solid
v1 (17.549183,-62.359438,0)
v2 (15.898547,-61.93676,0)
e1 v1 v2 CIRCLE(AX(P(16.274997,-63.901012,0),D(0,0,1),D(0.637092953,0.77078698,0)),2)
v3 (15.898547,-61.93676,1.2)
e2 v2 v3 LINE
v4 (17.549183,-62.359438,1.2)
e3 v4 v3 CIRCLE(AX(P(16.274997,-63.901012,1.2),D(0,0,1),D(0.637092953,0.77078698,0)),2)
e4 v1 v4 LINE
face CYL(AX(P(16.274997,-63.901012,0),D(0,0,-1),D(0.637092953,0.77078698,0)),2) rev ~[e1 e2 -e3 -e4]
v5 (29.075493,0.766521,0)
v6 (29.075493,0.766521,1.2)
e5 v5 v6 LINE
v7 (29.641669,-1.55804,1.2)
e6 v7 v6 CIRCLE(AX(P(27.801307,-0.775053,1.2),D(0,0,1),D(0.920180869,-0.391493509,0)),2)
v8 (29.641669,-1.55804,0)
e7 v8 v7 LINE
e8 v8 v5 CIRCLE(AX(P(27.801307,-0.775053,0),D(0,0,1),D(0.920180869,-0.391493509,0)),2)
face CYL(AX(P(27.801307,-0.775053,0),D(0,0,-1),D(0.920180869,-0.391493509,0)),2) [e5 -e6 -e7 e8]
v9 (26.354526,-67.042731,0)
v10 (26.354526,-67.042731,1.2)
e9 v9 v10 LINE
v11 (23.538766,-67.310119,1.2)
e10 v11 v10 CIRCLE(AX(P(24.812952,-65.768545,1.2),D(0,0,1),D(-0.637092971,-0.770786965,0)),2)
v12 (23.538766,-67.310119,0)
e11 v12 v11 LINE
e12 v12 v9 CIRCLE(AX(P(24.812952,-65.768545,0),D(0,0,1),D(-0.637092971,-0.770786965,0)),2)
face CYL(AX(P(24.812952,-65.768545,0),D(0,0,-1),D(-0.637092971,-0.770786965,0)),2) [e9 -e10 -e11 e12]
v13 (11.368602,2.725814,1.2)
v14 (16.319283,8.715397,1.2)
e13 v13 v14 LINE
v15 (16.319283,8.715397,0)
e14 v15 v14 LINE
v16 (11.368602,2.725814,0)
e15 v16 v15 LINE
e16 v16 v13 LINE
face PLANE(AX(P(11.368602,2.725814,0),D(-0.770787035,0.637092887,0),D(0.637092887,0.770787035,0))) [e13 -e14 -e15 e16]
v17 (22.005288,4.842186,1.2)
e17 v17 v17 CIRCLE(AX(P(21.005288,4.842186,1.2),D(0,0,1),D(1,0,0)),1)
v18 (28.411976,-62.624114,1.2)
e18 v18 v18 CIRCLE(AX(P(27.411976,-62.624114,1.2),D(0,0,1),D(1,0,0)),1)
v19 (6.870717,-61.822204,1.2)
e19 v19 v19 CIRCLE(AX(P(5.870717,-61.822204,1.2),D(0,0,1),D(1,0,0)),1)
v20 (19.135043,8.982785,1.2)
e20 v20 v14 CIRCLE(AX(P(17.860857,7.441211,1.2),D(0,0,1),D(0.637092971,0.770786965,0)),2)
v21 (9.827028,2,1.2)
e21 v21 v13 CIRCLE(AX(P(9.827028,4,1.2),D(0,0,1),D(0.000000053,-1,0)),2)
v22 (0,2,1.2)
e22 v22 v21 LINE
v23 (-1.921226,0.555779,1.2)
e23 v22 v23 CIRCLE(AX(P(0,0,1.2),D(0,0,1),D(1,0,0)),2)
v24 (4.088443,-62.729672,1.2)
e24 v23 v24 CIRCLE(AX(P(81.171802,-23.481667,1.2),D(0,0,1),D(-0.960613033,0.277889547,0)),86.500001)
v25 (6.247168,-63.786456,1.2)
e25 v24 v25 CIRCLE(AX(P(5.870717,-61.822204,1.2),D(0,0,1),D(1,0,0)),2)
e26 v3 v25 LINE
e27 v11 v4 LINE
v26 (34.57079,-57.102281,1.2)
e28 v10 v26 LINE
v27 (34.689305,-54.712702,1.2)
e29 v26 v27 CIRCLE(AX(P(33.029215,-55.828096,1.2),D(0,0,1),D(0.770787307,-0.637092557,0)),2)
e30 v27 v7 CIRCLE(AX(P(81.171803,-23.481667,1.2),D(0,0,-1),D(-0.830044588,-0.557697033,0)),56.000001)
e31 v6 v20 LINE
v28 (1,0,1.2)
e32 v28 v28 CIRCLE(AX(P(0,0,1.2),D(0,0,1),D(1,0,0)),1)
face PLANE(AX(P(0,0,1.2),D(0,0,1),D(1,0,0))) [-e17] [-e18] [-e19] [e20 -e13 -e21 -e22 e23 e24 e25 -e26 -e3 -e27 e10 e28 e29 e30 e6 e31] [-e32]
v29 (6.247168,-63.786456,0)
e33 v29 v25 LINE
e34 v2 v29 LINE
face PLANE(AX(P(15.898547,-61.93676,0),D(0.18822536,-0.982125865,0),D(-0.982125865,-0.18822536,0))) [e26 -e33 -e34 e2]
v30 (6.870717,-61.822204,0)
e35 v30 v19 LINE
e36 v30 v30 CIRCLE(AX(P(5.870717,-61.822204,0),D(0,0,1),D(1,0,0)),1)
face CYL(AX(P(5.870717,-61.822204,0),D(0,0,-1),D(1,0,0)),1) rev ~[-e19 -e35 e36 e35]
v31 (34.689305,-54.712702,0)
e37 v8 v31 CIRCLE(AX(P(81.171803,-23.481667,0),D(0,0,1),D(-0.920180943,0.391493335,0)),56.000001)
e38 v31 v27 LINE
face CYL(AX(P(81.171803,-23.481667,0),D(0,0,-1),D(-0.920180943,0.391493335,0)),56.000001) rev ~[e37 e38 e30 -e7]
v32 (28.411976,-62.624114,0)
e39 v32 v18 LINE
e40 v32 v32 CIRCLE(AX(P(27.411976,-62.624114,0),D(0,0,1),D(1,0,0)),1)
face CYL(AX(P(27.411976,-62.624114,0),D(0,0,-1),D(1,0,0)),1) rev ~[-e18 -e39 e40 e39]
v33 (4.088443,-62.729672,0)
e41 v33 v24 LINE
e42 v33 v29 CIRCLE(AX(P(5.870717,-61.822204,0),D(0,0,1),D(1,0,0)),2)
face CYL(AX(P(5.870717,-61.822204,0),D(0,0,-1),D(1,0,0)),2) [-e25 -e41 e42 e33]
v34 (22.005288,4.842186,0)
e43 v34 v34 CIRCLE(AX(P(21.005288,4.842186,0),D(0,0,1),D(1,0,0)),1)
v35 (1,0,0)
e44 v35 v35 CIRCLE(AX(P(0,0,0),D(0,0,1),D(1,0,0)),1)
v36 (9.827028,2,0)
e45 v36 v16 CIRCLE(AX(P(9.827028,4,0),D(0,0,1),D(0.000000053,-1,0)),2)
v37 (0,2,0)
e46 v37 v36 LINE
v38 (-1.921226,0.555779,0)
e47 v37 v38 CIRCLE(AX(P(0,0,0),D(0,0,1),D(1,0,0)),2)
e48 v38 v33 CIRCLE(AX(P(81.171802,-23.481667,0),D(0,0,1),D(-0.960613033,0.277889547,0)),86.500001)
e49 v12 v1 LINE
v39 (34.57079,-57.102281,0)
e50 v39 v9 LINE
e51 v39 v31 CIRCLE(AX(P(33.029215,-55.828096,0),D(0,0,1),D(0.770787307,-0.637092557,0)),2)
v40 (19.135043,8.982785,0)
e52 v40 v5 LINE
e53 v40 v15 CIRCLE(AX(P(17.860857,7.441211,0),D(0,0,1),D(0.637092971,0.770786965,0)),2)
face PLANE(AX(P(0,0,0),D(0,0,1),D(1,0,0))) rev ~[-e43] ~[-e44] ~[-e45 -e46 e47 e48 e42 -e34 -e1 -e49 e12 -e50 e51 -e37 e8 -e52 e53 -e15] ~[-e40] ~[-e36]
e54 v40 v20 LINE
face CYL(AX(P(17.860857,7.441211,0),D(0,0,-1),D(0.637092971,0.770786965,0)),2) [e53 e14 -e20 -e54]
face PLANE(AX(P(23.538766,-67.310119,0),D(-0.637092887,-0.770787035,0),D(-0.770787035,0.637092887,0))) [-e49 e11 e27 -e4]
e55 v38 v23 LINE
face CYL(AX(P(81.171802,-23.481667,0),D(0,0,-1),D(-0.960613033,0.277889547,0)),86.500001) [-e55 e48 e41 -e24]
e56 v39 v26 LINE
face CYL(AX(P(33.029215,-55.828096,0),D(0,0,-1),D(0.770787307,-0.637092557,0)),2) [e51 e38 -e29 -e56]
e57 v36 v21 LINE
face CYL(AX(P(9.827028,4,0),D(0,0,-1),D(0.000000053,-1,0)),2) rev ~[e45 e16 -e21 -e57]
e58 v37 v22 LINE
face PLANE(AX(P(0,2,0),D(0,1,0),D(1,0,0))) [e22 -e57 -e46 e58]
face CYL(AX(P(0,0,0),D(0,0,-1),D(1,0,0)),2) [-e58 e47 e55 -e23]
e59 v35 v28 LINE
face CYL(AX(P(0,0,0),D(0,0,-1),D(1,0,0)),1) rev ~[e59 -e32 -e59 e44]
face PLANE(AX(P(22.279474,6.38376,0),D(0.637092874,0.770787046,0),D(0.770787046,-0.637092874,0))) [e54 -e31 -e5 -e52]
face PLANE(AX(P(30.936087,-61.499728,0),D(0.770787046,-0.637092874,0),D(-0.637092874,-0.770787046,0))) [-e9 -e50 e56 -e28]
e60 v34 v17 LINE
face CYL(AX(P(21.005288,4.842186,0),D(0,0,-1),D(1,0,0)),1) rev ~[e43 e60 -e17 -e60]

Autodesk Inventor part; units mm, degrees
ref_plane "YZ Plane" through (0, 0, 0) normal (1, 0, 0) x (0, 1, 0)
ref_plane "XZ Plane" through (0, 0, 0) normal (0, 1, 0) x (-1, 0, 0)
ref_plane "XY Plane" through (0, 0, 0) normal (0, 0, 1) x (1, 0, 0)
sketch "スケッチ1" plane through (0, 0, 0) normal (0, 0, 1) x (1, 0, 0)
  circle A0 centre (21.005288, 4.842186) radius 2
  circle A1 centre (0, 0) radius 2
  circle A2 centre (81.171801, -23.481667) radius 63
  arc A3 (-1.921226, 0.555779) -> (4.088443, -62.729672) centre (81.171801, -23.481667) ccw
  line L0 (0, 2) -> (9.827028, 2)
  line L1 (11.368602, 2.725814) -> (16.319283, 8.715397)
  line L2 (19.135043, 8.982785) -> (29.075493, 0.766521)
  line L3 (8.206239, 4.393532) -> (1.777293, 9.707368)
  line L4 (40.328272, 40.117124) -> (11.021999, 4.660921)
  arc A4 (9.827028, 2) -> (11.368602, 2.725814) centre (9.827028, 4) ccw
  arc A5 (19.135043, 8.982785) -> (16.319283, 8.715397) centre (17.860857, 7.441211) ccw
  arc A6 (29.641669, -1.55804) -> (34.689305, -54.712702) centre (81.171801, -23.481667) ccw
  circle A7 centre (5.870717, -61.822204) radius 2
  circle A8 centre (27.411976, -62.624114) radius 2
  line L5 (81.171801, -23.481667) -> (18.171801, -23.481667)
  line L6 (34.57079, -57.102281) -> (26.354526, -67.042731)
  line L7 (17.573011, -64.325196) -> (53.029214, -93.631469)
  line L8 (17.573011, -64.325196) -> (53.029214, -93.631469)
  line L9 (9.443415, -71.02153) -> (14.757251, -64.592584)
  line L10 (23.538766, -67.310119) -> (17.549183, -62.359438)
  arc A9 (23.538766, -67.310119) -> (26.354526, -67.042731) centre (24.812952, -65.768545) ccw
  line L11 (15.898547, -61.93676) -> (6.247168, -63.786456)
  arc A10 (17.549183, -62.359438) -> (15.898547, -61.93676) centre (16.274997, -63.901012) ccw
  arc A11 (29.641669, -1.55804) -> (29.075493, 0.766521) centre (27.801307, -0.775053) ccw
  arc A12 (34.57079, -57.102281) -> (34.689305, -54.712702) centre (33.029216, -55.828096) ccw
  circle A13 centre (5.870717, -61.822204) radius 1
  circle A14 centre (27.411976, -62.624114) radius 1
  circle A15 centre (21.005288, 4.842186) radius 1
  circle A16 centre (0, 0) radius 1
  point P0 (0, 0)
  point P1 (30.241928, -0.197595)
  point P2 (35.534905, -55.935846)
  dimension "d0" = 1.5
  dimension "d1" = 2
  dimension "d3" = 56
  dimension "d8" = 2
  dimension "d9" = 2
extrude "押し出し1" add sketch "スケッチ1" along normal blind 1.2 contours A0 | A8 | L2 A2 L6 A9 L10 A10 L11 A7 A3 A1 L0 A4 L1 A5 | L2 A11 A6 L5 A2 | L5 A6 A12 L6 A2 | A1 | A7
properties part number "MainMCU_PCB"
